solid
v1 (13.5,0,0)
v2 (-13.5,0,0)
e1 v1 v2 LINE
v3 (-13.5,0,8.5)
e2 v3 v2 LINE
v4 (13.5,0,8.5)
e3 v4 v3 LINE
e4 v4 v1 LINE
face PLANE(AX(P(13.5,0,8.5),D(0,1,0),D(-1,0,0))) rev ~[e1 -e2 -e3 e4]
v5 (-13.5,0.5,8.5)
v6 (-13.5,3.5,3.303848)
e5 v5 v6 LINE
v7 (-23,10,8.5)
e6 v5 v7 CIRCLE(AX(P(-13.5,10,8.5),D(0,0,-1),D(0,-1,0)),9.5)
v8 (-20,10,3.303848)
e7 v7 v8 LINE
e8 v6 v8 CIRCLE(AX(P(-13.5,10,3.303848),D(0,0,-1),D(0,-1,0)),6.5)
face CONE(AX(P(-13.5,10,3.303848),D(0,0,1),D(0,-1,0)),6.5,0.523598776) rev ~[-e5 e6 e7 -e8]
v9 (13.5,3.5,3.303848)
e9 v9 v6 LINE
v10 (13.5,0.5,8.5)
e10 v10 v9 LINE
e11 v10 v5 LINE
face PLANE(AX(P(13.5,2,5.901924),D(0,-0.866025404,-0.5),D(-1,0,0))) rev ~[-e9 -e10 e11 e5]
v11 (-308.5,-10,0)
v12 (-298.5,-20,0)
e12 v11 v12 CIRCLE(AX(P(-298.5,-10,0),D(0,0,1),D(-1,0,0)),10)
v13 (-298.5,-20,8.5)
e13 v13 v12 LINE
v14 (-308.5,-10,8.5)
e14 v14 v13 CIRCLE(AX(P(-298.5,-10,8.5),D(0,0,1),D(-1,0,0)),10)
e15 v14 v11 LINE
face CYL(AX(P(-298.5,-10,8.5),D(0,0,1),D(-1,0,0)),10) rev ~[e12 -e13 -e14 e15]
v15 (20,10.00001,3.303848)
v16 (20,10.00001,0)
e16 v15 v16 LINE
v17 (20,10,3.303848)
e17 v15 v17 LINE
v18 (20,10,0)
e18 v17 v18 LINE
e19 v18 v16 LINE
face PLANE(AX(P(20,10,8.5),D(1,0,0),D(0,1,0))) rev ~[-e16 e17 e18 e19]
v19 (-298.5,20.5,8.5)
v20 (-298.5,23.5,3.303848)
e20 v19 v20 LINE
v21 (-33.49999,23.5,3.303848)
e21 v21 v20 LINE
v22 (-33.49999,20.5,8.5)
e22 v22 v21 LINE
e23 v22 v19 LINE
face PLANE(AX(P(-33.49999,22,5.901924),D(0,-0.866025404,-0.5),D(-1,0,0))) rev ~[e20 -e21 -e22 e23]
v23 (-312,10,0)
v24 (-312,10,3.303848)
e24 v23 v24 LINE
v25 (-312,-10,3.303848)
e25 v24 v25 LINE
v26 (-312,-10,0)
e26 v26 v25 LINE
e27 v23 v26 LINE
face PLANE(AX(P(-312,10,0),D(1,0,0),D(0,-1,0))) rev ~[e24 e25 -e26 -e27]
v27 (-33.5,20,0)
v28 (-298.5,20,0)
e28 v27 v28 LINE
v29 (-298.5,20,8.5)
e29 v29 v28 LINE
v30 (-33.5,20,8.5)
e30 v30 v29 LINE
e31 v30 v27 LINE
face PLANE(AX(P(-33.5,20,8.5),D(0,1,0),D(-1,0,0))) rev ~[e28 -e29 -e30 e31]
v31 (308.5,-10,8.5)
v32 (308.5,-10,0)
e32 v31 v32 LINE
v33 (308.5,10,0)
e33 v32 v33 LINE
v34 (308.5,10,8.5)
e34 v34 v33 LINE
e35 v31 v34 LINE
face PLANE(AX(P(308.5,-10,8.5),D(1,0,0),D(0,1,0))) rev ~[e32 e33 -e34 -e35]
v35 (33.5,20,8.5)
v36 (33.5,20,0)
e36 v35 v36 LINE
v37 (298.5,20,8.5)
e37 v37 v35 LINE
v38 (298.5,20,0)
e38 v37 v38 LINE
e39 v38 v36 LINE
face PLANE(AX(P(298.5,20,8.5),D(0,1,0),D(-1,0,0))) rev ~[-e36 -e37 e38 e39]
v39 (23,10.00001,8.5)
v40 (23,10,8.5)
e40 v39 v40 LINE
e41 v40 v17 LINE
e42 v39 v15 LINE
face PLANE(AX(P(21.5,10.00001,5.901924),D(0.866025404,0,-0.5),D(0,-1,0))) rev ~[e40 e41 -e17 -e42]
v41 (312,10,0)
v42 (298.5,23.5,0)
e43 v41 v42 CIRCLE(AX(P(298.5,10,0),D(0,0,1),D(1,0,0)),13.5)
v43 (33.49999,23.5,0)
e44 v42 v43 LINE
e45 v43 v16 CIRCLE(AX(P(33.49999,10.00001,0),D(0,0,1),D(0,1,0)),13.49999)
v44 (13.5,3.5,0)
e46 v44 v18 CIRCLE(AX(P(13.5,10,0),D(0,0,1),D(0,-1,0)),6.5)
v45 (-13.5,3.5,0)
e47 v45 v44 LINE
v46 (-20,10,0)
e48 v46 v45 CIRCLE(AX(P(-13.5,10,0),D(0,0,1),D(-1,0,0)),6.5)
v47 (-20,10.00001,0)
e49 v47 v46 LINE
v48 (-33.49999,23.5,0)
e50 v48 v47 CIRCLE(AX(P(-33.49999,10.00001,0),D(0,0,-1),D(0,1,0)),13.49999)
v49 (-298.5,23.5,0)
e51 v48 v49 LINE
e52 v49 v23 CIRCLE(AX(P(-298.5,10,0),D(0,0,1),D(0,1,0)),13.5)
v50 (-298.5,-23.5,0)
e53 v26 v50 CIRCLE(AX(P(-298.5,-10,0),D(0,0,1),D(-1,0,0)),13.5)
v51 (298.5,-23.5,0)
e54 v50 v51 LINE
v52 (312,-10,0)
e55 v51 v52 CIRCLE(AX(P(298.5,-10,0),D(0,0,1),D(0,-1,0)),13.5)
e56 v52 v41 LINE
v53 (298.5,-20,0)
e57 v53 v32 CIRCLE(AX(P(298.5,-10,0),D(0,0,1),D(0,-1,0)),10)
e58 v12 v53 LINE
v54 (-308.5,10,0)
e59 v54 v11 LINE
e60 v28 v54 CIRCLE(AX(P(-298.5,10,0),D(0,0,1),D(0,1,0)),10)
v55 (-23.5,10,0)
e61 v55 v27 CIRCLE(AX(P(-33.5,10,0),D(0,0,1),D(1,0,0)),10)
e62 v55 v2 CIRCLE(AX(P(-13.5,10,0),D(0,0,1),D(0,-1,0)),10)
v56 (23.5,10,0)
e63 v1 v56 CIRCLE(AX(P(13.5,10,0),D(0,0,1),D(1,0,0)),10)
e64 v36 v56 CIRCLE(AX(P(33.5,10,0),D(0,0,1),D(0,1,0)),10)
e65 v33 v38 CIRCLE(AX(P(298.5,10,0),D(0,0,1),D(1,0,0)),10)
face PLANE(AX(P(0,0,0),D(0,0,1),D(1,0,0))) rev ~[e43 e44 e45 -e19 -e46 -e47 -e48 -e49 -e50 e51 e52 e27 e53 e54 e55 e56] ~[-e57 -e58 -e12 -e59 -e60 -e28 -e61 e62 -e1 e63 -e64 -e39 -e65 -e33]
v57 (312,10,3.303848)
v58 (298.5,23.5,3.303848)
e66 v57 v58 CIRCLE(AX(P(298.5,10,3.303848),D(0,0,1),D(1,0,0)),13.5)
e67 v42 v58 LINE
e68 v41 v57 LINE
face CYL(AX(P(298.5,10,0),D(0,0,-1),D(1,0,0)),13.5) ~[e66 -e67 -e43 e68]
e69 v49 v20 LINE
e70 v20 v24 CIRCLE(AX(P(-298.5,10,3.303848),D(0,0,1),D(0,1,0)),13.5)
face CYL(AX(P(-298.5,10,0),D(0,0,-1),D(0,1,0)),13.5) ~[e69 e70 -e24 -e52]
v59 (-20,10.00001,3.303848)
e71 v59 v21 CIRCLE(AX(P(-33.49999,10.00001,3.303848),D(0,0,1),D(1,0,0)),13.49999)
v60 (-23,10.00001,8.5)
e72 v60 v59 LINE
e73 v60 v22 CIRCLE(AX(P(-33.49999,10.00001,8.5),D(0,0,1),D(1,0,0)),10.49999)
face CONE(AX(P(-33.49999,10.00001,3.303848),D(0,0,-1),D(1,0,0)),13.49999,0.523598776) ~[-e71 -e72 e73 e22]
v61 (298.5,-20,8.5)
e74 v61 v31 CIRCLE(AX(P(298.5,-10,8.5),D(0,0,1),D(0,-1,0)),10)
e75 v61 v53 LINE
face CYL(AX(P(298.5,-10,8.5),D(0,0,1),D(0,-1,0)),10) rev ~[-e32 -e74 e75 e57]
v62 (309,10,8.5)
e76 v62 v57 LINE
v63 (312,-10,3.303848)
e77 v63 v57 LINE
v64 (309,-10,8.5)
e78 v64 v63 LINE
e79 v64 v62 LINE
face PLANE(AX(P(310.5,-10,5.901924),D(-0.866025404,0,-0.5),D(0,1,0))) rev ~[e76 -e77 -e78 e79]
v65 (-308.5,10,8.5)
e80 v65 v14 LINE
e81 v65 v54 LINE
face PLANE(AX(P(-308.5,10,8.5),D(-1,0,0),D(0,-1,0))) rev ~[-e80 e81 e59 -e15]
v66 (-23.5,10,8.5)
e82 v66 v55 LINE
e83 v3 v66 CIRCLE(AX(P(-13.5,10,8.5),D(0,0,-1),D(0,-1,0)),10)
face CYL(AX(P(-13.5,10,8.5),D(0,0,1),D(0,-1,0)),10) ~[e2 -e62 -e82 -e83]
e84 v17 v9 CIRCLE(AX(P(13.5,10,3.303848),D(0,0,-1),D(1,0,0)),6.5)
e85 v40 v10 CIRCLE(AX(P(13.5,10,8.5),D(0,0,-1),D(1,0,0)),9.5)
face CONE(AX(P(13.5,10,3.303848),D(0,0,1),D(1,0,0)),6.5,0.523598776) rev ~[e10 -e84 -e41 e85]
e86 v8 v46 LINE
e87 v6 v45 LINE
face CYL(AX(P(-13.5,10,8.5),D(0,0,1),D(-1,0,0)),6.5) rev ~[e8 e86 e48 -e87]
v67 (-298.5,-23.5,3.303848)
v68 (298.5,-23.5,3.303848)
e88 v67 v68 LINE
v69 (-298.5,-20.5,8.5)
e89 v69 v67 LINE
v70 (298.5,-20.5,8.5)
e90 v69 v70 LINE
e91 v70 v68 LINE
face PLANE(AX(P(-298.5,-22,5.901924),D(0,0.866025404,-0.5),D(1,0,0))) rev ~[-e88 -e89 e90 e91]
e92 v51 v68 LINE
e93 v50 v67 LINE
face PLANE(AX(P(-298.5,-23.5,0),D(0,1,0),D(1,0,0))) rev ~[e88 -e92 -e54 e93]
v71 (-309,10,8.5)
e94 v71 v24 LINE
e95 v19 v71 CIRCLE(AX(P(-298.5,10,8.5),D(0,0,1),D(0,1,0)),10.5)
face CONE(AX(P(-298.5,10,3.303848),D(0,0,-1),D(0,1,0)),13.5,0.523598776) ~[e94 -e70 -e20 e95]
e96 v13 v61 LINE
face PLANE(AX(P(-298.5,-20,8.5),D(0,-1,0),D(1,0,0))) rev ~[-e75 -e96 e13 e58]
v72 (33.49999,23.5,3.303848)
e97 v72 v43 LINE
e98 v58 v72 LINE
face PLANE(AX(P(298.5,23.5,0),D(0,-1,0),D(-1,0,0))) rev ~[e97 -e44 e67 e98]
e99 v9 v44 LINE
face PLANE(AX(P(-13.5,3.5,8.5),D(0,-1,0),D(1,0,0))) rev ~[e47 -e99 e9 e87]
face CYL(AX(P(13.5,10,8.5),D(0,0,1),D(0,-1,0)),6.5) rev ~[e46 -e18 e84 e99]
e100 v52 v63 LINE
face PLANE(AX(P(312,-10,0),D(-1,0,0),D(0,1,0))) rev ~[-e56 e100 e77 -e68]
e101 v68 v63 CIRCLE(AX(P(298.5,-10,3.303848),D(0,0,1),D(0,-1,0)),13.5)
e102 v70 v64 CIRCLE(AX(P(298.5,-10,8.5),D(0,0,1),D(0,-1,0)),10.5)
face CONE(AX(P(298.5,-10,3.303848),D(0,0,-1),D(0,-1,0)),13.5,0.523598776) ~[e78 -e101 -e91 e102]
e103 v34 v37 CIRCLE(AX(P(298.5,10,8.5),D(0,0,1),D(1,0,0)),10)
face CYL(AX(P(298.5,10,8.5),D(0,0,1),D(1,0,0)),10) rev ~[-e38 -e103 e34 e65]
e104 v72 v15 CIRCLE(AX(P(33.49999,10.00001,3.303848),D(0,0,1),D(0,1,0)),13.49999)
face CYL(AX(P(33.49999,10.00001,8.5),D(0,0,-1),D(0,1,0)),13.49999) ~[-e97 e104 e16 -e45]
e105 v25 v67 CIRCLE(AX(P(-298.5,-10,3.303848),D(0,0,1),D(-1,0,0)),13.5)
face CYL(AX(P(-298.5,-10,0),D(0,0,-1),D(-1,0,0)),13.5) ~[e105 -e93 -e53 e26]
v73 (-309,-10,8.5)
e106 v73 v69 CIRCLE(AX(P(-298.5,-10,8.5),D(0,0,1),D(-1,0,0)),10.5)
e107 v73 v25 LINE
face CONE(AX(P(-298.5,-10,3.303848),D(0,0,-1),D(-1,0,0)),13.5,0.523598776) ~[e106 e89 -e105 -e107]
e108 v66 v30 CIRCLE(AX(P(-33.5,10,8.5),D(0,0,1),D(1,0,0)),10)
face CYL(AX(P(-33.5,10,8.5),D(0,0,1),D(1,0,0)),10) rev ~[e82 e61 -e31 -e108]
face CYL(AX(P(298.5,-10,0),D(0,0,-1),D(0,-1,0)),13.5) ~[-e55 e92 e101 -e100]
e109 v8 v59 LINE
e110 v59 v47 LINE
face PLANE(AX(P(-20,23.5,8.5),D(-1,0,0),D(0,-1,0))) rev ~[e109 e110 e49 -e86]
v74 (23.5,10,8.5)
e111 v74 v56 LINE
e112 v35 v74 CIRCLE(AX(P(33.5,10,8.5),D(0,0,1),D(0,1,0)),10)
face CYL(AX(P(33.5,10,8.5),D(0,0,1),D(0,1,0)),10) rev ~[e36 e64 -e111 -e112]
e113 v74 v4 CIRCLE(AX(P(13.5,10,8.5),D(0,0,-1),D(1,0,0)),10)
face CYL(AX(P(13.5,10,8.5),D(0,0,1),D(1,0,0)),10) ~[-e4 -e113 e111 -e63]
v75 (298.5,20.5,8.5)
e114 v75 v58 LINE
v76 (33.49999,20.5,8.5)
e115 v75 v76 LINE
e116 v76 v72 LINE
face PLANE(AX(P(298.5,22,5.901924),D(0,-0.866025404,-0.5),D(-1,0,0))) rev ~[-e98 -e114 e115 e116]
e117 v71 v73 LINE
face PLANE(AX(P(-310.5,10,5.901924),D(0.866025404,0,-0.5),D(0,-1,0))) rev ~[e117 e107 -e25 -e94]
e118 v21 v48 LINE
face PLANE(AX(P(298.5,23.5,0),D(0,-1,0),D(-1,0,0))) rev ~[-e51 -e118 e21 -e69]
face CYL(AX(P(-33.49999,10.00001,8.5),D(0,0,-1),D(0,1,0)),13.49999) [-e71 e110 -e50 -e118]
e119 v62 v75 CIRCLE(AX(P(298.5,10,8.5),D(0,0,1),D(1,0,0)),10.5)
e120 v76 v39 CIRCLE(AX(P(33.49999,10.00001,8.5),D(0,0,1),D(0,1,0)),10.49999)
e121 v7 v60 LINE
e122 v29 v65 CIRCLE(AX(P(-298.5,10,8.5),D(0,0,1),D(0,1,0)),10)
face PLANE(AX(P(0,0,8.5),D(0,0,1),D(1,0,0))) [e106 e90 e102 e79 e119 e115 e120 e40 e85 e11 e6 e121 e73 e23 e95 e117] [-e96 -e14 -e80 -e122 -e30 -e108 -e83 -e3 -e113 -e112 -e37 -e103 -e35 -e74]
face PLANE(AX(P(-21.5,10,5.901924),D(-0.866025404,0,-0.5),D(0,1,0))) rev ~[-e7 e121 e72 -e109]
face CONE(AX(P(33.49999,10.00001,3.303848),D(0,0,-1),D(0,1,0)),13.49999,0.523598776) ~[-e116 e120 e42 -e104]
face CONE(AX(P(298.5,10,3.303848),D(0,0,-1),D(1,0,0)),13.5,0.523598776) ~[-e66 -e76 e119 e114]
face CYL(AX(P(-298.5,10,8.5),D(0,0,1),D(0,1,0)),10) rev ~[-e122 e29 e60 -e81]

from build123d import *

# Parameters (mm, degrees)
F1_DEPTH = 8.5
F3_DEPTH = 8.501
F5_DEPTH = 8.501
F6_R     = 13.49999
F7_SIZE2 = 5.1961524227
F7_SIZE  = 3


# Not quite as in the source:
# - a fillet or chamfer is up to 0.001 mm smaller than in the source, because OpenCascade refuses the exact size


with BuildPart() as f1:
    # F0 (on Top) → F1 (new body)
    with BuildSketch(Plane.XY):
        with BuildLine():
            Line((-298.5, -23.5), (298.5, -23.5))
            ThreePointArc((298.5, -23.5), (308.045941546, -19.545941546), (312, -10))
            Line((312, -10), (312, 10))
            ThreePointArc((312, 10), (308.045941546, 19.545941546), (298.5, 23.5))
            Line((298.5, 23.5), (-298.5, 23.5))
            ThreePointArc((-298.5, 23.5), (-308.045941546, 19.545941546), (-312, 10))
            Line((-312, 10), (-312, -10))
            ThreePointArc((-312, -10), (-308.045941546, -19.545941546), (-298.5, -23.5))
        make_face()
    extrude(amount=F1_DEPTH)

    # F2 (on face) → F3 (cut, through all)
    with BuildSketch(Plane.XY.offset(8.5)):
        with BuildLine():
            Line((-13.5, 3.5), (13.5, 3.5))
            ThreePointArc((13.5, 3.5), (18.0961940777, 5.4038059223), (20, 10))
            Line((20, 10), (20, 23.5))
            Line((20, 23.5), (-20, 23.5))
            Line((-20, 23.5), (-20, 10))
            ThreePointArc((-20, 10), (-18.0961940777, 5.4038059223), (-13.5, 3.5))
        make_face()
    extrude(amount=-F3_DEPTH, mode=Mode.SUBTRACT)

    # F4 (on face) → F5 (cut, through all)
    with BuildSketch(Plane.XY.offset(8.5)):
        with BuildLine():
            Line((-308.5, 10), (-308.5, -10))
            ThreePointArc((-308.5, -10), (-305.5710678119, -17.0710678119), (-298.5, -20))
            Line((-298.5, -20), (298.5, -20))
            ThreePointArc((298.5, -20), (305.5710678119, -17.0710678119), (308.5, -10))
            Line((308.5, -10), (308.5, 10))
            ThreePointArc((308.5, 10), (305.5710678119, 17.0710678119), (298.5, 20))
            Line((298.5, 20), (33.5, 20))
            ThreePointArc((33.5, 20), (26.4289321881, 17.0710678119), (23.5, 10))
            ThreePointArc((23.5, 10), (20.5710678119, 2.9289321881), (13.5, 0))
            Line((13.5, 0), (-13.5, 0))
            ThreePointArc((-13.5, 0), (-20.5710678119, 2.9289321881), (-23.5, 10))
            ThreePointArc((-23.5, 10), (-26.4289321881, 17.0710678119), (-33.5, 20))
            Line((-33.5, 20), (-298.5, 20))
            ThreePointArc((-298.5, 20), (-305.5710678119, 17.0710678119), (-308.5, 10))
        make_face()
    extrude(amount=-F5_DEPTH, mode=Mode.SUBTRACT)

    # F6 (radius 13.5 in the source; OpenCascade refuses exactly that, so slightly less here)
    f6_edges = [f1.edges().sort_by_distance(p)[0] for p in [
        (-20, 23.5, 4.25),
        (20, 23.5, 4.25),
    ]]
    fillet(f6_edges, radius=F6_R)

    # F7
    f7_edges = [f1.edges().sort_by_distance(p)[0] for p in [
        (165.999995, 23.5, 8.5),
    ]]
    f7_side = f1.faces().sort_by_distance((-165.999995, 22.874232, 8.5))[0]
    chamfer(f7_edges, length=F7_SIZE, length2=F7_SIZE2, reference=f7_side)


solid = f1.part
